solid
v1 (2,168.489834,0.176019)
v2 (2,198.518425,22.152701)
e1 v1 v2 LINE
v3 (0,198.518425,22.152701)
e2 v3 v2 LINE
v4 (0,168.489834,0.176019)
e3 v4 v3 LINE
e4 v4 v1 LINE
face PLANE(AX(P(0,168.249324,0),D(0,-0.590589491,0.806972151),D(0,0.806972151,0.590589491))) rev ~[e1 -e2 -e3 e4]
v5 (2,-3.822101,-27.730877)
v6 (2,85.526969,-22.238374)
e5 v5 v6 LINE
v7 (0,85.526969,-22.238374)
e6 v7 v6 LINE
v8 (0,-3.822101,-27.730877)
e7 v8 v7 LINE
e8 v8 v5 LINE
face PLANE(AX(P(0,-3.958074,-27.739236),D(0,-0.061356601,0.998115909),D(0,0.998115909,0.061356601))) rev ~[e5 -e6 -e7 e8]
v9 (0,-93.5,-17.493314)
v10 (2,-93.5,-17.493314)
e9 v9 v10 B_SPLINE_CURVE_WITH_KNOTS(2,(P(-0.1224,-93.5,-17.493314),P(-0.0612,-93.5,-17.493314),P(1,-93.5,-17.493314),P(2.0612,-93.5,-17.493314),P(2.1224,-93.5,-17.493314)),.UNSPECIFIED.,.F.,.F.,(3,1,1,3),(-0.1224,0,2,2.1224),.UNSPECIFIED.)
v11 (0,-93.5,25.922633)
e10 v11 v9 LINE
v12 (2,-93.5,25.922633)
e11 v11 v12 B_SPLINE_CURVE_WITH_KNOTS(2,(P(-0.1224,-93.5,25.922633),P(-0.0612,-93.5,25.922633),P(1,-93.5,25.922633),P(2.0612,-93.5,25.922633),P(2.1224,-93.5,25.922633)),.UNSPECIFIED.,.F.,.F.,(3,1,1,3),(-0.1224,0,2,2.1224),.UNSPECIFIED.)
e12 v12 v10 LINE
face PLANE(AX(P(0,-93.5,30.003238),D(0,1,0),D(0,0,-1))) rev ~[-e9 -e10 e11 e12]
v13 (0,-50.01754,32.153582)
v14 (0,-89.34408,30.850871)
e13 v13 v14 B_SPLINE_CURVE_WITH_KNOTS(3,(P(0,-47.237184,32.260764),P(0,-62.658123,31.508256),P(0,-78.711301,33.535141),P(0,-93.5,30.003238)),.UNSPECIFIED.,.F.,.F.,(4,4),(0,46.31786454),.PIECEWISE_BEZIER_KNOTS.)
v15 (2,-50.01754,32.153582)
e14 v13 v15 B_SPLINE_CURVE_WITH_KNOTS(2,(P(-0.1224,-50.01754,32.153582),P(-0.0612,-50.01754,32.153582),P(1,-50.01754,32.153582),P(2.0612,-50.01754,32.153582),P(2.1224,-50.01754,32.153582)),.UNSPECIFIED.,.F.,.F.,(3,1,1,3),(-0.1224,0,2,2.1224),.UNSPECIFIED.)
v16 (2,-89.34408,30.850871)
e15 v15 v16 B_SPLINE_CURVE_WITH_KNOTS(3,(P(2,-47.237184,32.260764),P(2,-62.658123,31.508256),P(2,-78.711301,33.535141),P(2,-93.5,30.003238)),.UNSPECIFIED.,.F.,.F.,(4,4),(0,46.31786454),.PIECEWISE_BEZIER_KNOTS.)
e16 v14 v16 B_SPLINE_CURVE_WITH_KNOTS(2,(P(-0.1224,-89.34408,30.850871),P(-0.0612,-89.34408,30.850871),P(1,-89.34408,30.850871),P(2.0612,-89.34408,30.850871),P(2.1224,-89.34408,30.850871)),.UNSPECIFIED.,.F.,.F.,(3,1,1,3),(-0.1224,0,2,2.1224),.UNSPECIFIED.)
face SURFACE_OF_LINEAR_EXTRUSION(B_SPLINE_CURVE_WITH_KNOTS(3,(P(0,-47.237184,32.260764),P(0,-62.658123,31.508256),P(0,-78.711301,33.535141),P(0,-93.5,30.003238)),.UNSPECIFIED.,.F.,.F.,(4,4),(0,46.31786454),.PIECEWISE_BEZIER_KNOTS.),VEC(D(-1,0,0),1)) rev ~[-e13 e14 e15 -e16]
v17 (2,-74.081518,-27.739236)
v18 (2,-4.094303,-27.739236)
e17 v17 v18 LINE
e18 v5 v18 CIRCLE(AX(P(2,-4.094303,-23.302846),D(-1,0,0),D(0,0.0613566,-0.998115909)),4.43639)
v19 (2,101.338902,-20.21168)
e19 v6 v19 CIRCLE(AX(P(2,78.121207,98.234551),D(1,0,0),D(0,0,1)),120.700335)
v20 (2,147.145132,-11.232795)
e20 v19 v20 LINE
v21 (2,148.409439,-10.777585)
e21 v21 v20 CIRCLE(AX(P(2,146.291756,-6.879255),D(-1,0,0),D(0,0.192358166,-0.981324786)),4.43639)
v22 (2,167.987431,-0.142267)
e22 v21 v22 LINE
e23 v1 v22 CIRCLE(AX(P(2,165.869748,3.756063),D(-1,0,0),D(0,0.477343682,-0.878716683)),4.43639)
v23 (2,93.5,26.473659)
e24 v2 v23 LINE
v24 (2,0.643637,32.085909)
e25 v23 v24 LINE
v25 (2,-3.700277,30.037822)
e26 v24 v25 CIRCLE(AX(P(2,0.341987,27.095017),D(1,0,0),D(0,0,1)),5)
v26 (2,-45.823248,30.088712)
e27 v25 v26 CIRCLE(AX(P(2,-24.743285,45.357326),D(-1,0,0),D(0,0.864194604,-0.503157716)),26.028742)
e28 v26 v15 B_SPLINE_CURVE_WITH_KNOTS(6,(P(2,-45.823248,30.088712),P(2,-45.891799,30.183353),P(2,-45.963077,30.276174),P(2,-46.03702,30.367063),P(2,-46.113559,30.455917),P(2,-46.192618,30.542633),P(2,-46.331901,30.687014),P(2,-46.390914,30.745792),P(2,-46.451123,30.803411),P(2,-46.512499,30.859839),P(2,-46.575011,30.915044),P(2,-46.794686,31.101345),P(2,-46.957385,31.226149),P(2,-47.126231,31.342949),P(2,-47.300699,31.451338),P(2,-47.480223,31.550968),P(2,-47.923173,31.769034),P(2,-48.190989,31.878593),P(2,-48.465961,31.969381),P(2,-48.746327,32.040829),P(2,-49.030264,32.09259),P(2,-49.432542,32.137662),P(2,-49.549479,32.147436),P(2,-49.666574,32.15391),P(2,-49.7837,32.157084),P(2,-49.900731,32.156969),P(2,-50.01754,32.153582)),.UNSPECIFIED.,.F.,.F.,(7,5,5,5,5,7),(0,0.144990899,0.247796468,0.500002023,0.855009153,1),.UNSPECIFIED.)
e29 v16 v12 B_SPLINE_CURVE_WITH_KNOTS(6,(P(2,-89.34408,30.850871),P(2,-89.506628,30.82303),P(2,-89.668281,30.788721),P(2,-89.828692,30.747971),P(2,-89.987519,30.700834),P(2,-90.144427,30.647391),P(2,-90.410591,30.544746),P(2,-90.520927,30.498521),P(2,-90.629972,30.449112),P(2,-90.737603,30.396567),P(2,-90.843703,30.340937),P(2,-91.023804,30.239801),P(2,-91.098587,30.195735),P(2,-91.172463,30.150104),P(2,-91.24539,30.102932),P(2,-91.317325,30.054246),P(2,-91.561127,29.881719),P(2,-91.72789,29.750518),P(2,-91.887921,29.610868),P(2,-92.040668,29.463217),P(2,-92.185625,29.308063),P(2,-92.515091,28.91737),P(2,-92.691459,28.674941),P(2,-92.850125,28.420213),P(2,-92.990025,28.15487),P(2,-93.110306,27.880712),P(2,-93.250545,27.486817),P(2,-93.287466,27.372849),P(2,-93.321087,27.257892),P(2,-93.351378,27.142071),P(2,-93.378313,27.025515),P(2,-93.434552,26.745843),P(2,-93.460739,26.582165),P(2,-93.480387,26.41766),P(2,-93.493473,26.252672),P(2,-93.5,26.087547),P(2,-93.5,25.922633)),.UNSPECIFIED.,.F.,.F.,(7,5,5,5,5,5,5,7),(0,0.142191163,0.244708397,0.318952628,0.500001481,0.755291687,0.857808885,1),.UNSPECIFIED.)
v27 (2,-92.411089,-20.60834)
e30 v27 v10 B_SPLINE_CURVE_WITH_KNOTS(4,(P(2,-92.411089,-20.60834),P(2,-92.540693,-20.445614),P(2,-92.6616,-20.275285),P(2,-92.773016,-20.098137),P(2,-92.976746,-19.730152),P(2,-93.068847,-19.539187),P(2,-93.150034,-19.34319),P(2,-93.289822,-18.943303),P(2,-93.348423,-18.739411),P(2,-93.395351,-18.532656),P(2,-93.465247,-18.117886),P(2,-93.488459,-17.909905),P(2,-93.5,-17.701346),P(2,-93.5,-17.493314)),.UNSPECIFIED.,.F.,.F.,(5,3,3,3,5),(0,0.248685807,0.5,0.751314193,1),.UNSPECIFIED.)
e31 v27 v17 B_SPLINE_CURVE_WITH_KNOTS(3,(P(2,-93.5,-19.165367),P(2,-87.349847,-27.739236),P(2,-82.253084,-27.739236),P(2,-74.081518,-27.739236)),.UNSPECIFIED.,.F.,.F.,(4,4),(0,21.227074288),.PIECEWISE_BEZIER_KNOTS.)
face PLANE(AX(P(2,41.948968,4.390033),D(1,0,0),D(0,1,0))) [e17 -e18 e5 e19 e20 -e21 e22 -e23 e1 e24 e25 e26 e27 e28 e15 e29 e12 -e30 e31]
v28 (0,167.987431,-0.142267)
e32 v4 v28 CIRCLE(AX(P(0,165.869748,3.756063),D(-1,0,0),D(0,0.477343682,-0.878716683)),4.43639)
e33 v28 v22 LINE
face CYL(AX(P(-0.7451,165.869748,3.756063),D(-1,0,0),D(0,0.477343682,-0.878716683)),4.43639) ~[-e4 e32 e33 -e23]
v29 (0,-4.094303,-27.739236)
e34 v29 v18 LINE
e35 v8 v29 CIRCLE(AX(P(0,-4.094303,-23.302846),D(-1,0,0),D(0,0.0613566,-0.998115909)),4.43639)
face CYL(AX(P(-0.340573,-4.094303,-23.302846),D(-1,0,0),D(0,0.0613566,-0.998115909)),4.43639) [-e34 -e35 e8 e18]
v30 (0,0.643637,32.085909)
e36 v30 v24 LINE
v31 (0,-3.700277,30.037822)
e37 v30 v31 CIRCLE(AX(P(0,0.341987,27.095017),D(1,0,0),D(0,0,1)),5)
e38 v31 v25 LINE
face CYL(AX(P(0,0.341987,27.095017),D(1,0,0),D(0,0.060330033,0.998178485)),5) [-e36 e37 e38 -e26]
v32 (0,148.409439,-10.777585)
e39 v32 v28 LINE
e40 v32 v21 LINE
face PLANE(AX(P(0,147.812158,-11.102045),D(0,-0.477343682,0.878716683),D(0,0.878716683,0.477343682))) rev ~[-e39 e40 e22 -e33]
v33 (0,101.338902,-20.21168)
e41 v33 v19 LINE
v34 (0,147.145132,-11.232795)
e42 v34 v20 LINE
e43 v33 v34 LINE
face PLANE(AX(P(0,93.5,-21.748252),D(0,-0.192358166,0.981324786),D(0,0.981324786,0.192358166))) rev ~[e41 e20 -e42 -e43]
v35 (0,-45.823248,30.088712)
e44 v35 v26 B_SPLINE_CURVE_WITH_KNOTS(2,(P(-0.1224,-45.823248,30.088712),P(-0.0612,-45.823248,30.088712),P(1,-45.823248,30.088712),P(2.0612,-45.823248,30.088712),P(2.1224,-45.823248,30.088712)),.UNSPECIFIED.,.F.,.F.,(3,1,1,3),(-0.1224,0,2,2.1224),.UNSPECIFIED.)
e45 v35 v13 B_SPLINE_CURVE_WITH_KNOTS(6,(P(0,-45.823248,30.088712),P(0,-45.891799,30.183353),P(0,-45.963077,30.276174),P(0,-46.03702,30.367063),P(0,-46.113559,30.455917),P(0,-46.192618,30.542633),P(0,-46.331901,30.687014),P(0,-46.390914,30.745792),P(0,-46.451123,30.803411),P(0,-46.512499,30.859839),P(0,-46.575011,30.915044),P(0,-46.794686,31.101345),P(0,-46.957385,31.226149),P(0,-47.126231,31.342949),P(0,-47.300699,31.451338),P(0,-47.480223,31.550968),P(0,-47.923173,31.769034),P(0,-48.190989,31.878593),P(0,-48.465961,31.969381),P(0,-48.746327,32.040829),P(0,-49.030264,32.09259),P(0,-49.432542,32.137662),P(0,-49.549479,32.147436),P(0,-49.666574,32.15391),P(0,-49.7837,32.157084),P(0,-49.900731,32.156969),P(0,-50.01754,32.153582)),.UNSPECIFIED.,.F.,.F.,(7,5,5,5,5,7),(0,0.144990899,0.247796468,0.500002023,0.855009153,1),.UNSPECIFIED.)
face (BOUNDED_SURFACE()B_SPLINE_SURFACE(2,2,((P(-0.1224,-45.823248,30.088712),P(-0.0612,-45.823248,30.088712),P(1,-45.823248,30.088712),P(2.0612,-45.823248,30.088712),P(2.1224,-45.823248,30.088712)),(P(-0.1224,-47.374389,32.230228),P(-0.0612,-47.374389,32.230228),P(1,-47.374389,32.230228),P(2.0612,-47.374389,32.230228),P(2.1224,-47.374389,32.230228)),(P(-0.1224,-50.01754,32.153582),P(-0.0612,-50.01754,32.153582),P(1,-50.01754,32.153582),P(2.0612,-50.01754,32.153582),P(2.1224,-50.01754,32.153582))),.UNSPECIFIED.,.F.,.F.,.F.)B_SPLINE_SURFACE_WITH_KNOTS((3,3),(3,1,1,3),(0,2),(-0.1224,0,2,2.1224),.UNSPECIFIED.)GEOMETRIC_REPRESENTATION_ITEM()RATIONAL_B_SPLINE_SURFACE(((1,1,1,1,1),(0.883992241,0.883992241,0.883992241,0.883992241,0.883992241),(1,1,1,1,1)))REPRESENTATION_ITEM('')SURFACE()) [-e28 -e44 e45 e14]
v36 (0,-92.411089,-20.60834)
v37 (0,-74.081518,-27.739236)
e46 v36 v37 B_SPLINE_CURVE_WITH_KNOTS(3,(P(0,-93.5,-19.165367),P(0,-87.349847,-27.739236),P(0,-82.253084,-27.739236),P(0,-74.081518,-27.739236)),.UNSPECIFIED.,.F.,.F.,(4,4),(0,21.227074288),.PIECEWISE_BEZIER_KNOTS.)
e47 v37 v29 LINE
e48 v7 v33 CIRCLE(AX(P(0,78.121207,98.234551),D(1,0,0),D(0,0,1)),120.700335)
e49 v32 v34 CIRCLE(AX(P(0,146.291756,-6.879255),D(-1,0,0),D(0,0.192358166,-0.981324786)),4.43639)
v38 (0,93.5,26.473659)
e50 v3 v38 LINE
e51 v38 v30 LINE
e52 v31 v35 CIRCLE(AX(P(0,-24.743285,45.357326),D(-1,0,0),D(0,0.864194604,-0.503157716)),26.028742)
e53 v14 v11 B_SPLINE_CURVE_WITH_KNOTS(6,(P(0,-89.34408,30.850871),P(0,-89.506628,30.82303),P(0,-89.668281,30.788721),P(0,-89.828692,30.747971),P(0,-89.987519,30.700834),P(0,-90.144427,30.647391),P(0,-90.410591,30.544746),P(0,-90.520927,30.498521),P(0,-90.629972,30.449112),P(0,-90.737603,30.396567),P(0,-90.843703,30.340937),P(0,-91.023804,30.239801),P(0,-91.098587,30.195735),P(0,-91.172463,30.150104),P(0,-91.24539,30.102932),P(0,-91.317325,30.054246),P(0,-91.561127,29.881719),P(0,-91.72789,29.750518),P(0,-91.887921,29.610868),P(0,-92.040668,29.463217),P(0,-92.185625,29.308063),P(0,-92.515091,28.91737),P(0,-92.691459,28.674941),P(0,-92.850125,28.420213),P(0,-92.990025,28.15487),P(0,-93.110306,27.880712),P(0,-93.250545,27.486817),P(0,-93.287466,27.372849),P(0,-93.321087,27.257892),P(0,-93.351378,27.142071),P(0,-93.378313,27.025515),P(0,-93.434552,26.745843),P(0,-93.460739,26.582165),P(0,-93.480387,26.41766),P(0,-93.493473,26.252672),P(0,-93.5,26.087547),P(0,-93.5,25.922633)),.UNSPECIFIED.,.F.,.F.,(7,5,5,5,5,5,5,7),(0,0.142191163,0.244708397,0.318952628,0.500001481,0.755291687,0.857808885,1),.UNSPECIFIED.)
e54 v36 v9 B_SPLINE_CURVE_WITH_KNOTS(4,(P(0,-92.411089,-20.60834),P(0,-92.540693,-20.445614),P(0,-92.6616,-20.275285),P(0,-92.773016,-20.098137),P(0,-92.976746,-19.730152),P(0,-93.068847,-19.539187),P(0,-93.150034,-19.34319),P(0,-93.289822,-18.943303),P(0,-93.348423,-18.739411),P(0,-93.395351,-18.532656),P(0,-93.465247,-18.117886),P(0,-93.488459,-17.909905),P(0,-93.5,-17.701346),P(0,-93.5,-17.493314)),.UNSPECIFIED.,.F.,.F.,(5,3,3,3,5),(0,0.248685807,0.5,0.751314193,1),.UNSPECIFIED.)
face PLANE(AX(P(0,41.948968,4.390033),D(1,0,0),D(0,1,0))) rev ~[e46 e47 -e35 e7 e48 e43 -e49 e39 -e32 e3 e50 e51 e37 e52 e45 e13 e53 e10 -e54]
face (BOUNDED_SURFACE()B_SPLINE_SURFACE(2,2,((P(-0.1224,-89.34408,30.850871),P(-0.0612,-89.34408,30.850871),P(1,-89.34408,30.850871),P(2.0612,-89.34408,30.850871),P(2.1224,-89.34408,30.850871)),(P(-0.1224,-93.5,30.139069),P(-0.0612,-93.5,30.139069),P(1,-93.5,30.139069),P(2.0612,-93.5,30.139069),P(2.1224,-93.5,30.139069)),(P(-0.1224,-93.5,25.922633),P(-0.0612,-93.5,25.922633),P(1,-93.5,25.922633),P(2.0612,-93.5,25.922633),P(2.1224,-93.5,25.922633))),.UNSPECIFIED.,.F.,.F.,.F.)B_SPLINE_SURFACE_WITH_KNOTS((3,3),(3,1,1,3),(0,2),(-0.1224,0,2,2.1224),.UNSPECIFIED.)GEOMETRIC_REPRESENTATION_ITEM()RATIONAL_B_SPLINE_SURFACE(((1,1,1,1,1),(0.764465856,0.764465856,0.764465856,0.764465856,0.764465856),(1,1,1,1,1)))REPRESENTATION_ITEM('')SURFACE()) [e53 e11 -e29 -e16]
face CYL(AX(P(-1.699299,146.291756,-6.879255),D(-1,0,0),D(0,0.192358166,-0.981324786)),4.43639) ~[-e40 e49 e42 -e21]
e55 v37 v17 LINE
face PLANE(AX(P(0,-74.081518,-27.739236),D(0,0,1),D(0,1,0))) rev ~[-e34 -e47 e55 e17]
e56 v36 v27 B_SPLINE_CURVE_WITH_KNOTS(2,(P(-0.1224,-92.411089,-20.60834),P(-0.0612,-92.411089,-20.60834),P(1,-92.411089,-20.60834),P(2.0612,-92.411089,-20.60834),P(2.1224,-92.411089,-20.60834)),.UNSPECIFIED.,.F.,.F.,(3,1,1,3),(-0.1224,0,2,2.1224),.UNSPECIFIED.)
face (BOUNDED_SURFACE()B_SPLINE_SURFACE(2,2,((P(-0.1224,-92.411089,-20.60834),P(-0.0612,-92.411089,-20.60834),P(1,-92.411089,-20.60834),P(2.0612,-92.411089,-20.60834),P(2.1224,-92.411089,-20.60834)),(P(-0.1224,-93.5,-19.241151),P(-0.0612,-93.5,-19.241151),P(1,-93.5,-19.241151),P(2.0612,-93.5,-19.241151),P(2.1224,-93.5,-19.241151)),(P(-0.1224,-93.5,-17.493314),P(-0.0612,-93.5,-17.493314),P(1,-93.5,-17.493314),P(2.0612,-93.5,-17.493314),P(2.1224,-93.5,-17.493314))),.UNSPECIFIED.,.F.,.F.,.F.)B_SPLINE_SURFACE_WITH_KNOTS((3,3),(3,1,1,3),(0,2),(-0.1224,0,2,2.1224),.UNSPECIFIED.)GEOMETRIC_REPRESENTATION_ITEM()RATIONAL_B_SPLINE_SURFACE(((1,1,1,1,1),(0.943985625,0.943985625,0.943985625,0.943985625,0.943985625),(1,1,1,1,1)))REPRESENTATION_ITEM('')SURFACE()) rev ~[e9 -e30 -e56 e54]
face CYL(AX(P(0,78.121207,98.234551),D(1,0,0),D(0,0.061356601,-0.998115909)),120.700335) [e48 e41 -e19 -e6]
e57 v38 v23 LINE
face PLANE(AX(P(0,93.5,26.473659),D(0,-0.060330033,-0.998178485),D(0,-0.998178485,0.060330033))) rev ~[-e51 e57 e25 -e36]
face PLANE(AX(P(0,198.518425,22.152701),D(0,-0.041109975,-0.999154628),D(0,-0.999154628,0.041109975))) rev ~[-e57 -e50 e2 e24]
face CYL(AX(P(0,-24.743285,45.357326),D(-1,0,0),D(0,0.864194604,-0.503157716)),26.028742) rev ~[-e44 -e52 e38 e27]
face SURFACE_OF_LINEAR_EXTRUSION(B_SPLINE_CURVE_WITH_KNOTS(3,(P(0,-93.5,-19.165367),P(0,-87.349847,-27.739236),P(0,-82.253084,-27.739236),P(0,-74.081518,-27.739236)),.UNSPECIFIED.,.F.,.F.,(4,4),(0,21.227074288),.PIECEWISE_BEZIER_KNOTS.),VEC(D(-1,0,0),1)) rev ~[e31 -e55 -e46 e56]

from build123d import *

# Parameters (mm, degrees)
F1_DEPTH    = 2
F2_R        = 5
F3_R        = 120.7003354098
F4_T1_DEPTH = 5.3985988059
F4_T3_DEPTH = 3.4901996791
F4_T5_DEPTH = 2.6811462233


# Not quite as in the source:
# - a fillet or chamfer that OpenCascade refuses, or shapes differently, is made with other operations: its cross-section is extruded or revolved along the edge and cut away or added
# - a feature names something its author has since deleted; it is built from what else it names


with BuildPart() as f1:
    # F0 (on Right) → F1 (new body)
    with BuildSketch(Plane.YZ):
        with BuildLine():
            add(Edge.make_bspline(
                [(-93.5, -19.165366888), (-87.3498469591, -27.7392359194), (-82.2530835867, -27.7392359194), (-74.081517756, -27.7392359194)],
                knots=[0, 0, 0, 0, 21.227074288, 21.227074288, 21.227074288, 21.227074288], degree=3))
            Line((-74.081517756, -27.7392359194), (-3.9580739103, -27.7392359194))
            Line((-3.9580739103, -27.7392359194), (93.5, -21.748252213))
            Line((93.5, -21.748252213), (147.8121578693, -11.1020449549))
            Line((147.8121578693, -11.1020449549), (168.2493239641, 0))
            Line((168.2493239641, 0), (198.5184252262, 22.1527013928))
            Line((198.5184252262, 22.1527013928), (93.5, 26.4736590703))
            Line((93.5, 26.4736590703), (-2.2493870929, 32.2607640806))
            ThreePointArc((-2.2493870929, 32.2607640806), (-24.7432854958, 19.3285844403), (-47.2371838987, 32.2607640806))
            add(Edge.make_bspline(
                [(-47.2371838987, 32.2607640806), (-62.6581225991, 31.5082555435), (-78.7113010883, 33.5351414979), (-93.5, 30.0032384694)],
                knots=[0, 0, 0, 0, 46.3178645396, 46.3178645396, 46.3178645396, 46.3178645396], degree=3))
            Line((-93.5, 30.0032384694), (-93.5, -19.165366888))
        make_face()
    extrude(amount=F1_DEPTH)

    # F2
    f2_edges = [f1.edges().sort_by_distance(p)[0] for p in [
        (1, -93.5, 30.003238),
        (1, -47.237184, 32.260764),
        (1, -2.249387, 32.260764),
        (1, -93.5, -19.165367),
        (1, -3.958074, -27.739236),
    ]]
    fillet(f2_edges, radius=F2_R)

    # F3
    f3_edges = [f1.edges().sort_by_distance(p)[0] for p in [
        (1, 93.5, -21.748252),
    ]]
    fillet(f3_edges, radius=F3_R)

    # F4: fillet of radius 4.436390167 on 3 edges, made by hand

    # F4_s2 → F4_t1 (cut)
    with BuildSketch(Plane.YZ.offset(-1.699299403)):
        with BuildLine():
            ThreePointArc((147.14513202, -11.2327946013), (147.7946205368, -11.0533364649), (148.4094389633, -10.7775850212))
            Line((148.4094389633, -10.7775850212), (147.8121578693, -11.1020449549))
            Line((147.8121578693, -11.1020449549), (147.14513202, -11.2327946013))
        make_face()
    extrude(amount=F4_T1_DEPTH, mode=Mode.SUBTRACT)

    # F4_s4 → F4_t3 (cut)
    with BuildSketch(Plane.YZ.offset(-0.7450998395)):
        with BuildLine():
            ThreePointArc((167.9874313003, -0.1422674804), (168.2439722622, 0.0084474426), (168.4898338923, 0.176019254))
            Line((168.4898338923, 0.176019254), (168.2493239641, 0))
            Line((168.2493239641, 0), (167.9874313003, -0.1422674804))
        make_face()
    extrude(amount=F4_T3_DEPTH, mode=Mode.SUBTRACT)

    # F4_s6 → F4_t5 (cut)
    with BuildSketch(Plane.YZ.offset(-0.3405731116)):
        with BuildLine():
            ThreePointArc((-3.822101334, -27.730877356), (-3.9581380925, -27.7371457861), (-4.094303155, -27.7392359194))
            Line((-4.094303155, -27.7392359194), (-3.9580739103, -27.7392359194))
            Line((-3.9580739103, -27.7392359194), (-3.822101334, -27.730877356))
        make_face()
    extrude(amount=F4_T5_DEPTH, mode=Mode.SUBTRACT)


solid = f1.part
